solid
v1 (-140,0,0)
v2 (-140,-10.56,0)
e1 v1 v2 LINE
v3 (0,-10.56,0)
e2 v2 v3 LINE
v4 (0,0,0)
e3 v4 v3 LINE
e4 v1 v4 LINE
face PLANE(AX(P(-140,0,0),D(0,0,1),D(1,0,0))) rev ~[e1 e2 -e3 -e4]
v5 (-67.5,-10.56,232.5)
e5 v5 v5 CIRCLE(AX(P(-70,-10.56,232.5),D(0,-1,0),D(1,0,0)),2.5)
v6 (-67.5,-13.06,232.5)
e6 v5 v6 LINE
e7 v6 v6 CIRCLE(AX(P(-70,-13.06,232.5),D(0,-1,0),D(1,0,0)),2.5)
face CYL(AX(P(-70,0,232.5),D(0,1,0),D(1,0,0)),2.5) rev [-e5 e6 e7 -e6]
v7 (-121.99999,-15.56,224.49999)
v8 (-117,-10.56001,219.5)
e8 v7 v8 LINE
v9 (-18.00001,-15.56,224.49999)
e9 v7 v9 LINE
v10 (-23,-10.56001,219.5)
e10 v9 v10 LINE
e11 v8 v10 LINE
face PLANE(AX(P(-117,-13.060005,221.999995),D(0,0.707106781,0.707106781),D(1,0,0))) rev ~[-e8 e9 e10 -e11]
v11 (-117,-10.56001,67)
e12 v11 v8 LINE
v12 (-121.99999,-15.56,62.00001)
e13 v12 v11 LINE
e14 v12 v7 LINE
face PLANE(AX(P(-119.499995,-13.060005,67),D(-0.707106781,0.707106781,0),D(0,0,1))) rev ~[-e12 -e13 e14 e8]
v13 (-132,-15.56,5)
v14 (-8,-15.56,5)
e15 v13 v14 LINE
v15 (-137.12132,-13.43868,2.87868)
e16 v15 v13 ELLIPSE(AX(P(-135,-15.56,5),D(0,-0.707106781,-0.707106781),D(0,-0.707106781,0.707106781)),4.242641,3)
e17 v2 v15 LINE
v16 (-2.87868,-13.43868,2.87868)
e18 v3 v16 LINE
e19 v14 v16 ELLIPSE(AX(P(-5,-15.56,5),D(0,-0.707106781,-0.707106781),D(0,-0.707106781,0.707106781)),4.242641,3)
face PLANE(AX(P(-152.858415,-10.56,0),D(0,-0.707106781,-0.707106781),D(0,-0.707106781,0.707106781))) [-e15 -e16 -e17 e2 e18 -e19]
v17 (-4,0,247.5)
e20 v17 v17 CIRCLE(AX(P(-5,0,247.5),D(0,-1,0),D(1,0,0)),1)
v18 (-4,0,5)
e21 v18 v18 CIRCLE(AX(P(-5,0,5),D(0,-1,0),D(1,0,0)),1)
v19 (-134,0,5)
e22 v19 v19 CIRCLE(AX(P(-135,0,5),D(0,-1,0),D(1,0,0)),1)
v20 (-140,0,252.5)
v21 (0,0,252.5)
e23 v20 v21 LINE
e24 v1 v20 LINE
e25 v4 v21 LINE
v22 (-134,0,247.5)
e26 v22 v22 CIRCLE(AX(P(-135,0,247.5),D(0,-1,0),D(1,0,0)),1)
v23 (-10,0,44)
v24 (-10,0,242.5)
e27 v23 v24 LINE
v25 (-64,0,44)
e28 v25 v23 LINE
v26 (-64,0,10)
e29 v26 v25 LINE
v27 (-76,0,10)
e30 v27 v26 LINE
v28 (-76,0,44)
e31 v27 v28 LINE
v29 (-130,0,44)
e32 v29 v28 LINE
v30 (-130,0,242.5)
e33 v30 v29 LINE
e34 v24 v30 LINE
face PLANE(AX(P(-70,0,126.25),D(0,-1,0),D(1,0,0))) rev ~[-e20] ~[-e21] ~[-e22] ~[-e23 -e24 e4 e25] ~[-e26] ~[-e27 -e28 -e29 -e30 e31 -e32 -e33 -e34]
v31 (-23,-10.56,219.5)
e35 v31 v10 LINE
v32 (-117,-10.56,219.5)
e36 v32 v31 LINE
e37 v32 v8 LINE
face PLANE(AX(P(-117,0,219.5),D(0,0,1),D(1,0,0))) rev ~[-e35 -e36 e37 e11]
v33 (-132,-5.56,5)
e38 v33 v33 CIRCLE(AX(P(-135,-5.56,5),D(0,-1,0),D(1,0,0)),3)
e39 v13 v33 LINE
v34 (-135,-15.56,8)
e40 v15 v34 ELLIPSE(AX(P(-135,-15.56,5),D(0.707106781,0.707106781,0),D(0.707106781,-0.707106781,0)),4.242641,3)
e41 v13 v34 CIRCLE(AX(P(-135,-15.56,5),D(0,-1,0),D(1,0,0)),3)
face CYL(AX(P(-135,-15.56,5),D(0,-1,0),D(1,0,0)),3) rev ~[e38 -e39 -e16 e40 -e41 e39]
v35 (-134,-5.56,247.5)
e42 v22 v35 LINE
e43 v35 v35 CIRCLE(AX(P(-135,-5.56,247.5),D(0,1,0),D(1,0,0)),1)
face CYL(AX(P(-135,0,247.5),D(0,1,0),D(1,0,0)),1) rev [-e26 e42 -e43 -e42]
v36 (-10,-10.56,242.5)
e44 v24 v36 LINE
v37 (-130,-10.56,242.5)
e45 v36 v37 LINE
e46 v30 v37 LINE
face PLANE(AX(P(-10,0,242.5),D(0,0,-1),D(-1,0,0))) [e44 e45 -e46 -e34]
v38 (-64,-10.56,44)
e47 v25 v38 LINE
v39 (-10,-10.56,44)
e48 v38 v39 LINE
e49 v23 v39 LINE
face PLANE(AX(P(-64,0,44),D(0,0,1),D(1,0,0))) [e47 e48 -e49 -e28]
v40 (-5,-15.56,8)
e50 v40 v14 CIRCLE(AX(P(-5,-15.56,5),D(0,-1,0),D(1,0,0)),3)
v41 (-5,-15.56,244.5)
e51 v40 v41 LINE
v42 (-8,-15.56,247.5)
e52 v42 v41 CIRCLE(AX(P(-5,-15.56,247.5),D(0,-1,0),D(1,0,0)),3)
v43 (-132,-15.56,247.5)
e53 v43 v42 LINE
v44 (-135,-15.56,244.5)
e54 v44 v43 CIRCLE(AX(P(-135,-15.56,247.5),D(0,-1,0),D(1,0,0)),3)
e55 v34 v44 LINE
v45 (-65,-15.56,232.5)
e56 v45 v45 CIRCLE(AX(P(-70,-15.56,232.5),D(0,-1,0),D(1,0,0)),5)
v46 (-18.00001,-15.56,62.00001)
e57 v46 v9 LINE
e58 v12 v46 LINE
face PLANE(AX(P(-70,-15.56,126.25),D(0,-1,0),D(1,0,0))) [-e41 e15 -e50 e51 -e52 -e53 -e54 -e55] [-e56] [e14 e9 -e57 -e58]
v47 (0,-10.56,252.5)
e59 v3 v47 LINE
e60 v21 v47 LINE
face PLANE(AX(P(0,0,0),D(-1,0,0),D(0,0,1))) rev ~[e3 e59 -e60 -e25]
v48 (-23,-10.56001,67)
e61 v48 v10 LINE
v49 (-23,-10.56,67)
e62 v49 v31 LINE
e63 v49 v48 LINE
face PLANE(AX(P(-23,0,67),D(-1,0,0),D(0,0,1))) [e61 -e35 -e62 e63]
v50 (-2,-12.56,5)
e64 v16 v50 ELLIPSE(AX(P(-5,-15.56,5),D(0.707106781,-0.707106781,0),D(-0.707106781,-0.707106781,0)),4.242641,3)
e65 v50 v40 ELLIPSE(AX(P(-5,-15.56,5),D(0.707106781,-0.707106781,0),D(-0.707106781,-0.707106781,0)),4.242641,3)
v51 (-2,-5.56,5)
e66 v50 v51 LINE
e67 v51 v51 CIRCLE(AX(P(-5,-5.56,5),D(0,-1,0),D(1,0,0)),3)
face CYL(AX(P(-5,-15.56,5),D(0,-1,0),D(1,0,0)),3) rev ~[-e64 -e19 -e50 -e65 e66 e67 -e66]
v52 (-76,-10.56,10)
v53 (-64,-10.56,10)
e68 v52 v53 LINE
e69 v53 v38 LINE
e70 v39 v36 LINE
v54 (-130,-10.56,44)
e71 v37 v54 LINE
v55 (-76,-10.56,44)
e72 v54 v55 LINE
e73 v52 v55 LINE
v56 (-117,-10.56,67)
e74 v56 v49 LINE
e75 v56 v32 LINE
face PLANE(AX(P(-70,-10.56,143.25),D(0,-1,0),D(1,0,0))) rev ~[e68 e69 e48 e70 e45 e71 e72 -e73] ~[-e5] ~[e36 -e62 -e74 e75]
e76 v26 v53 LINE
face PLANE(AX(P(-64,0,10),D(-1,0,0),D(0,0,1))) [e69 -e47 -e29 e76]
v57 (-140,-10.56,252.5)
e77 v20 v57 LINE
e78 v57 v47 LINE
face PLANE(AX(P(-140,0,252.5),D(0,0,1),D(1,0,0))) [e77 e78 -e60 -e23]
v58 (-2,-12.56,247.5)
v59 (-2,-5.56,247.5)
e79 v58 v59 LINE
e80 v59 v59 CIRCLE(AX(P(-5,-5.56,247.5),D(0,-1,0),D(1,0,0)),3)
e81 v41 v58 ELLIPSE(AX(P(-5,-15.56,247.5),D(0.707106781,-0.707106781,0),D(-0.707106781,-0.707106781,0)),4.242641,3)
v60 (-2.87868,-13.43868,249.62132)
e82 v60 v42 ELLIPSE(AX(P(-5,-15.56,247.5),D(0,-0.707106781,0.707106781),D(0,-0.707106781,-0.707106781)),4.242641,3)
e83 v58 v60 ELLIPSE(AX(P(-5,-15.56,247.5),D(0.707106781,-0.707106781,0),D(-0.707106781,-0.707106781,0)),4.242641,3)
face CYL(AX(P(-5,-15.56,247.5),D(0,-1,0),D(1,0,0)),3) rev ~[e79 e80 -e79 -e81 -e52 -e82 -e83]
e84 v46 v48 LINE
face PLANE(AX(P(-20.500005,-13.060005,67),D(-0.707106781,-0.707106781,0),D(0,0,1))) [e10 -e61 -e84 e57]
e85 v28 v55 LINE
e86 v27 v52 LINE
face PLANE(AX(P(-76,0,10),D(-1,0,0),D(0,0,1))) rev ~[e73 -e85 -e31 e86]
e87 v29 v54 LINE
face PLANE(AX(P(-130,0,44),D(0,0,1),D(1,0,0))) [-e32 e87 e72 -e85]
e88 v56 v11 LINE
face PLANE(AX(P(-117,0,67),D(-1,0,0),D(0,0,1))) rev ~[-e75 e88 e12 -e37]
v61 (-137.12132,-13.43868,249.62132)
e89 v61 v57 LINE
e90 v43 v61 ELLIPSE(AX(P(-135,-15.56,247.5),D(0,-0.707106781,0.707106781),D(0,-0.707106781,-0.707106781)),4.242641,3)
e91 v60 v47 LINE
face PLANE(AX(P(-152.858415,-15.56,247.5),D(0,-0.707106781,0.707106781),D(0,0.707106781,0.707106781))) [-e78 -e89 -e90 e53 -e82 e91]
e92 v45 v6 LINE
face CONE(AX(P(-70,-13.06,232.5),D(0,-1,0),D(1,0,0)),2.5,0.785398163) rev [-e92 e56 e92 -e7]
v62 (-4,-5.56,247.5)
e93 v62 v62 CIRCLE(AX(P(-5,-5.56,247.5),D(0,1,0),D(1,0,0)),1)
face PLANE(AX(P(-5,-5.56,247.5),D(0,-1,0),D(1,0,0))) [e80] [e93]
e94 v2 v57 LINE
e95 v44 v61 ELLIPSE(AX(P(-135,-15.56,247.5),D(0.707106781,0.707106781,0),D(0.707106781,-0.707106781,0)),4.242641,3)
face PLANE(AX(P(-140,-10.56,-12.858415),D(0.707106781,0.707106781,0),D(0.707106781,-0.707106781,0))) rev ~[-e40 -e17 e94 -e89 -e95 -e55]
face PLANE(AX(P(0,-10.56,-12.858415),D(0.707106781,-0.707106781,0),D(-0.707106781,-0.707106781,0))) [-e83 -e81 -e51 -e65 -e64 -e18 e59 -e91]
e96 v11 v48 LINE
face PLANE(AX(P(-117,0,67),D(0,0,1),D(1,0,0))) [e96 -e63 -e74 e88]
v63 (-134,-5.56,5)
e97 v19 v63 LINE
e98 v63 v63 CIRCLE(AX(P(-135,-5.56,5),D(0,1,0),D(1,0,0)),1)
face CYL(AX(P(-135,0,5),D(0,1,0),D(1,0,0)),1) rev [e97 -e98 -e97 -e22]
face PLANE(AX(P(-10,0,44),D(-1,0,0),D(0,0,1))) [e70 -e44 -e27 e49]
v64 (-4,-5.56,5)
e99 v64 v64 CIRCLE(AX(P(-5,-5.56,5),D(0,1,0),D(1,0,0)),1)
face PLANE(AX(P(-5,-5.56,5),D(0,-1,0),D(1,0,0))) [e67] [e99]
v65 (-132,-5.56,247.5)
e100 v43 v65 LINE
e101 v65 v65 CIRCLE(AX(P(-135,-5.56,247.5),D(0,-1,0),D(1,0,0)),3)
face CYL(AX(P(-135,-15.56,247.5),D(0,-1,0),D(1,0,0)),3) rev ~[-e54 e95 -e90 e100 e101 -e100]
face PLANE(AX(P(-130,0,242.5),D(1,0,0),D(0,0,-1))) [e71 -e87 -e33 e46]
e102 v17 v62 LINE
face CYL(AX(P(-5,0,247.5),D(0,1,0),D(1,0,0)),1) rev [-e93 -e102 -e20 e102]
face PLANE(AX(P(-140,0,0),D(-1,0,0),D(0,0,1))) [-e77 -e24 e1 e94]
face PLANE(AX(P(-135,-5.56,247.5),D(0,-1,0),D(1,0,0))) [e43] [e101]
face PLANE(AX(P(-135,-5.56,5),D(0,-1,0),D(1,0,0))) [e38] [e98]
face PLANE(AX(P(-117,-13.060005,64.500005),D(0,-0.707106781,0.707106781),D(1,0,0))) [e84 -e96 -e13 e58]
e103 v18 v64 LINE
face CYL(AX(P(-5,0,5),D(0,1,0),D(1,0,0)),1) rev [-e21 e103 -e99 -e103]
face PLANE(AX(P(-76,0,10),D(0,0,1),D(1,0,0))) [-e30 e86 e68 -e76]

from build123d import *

# Parameters (mm, degrees)
F0_W        = 140
F0_H        = 252.5
F0_R        = 1
F0_W_2      = 94
F0_H_2      = 152.5
F0_R_2      = 2.5
F0_W_3      = 12
F0_H_3      = 34
F1_DEPTH    = 15.56
F2_DEPTH    = 10.56
F3_T1_DEPTH = 165.7168298797
F3_T3_DEPTH = 278.2168298797
F4_SIZE     = 2.5
F5_R        = 3
F6_DEPTH    = 10
F7_SIZE     = 4.99999


# Not quite as in the source:
# - a fillet or chamfer that OpenCascade refuses, or shapes differently, is made with other operations: its cross-section is extruded or revolved along the edge and cut away or added
# - a fillet or chamfer is up to 0.001 mm smaller than in the source, because OpenCascade refuses the exact size
# - a feature names something its author has since deleted; it is built from what else it names


with BuildPart() as f1:
    # F0 (on Front) → F1 (new body)
    with BuildSketch(Plane.XZ):
        with Locations((-70, 126.25)):
            Rectangle(F0_W, F0_H)
        with Locations((-135, 5)):
            Circle(F0_R, mode=Mode.SUBTRACT)
        with Locations((-5, 5)):
            Circle(F0_R, mode=Mode.SUBTRACT)
        with Locations((-135, 247.5)):
            Circle(F0_R, mode=Mode.SUBTRACT)
        Polygon((-130, 44), (-130, 242.5), (-10, 242.5), (-10, 44), (-64, 44), (-64, 10), (-76, 10), (-76, 44), align=None, mode=Mode.SUBTRACT)
        with Locations((-5, 247.5)):
            Circle(F0_R, mode=Mode.SUBTRACT)
        Polygon((-10, 242.5), (-130, 242.5), (-130, 44), (-76, 44), (-64, 44), (-10, 44), align=None)
        with Locations((-70, 143.25)):
            Rectangle(F0_W_2, F0_H_2, mode=Mode.SUBTRACT)
        with Locations((-70, 232.5)):
            Circle(F0_R_2, mode=Mode.SUBTRACT)
        with Locations((-70, 27)):
            Rectangle(F0_W_3, F0_H_3)
    extrude(amount=F1_DEPTH)

    # F0 (on Front) → F2 (cut)
    with BuildSketch(Plane.XZ):
        Polygon((-10, 242.5), (-130, 242.5), (-130, 44), (-76, 44), (-64, 44), (-10, 44), align=None)
        with Locations((-70, 143.25)):
            Rectangle(F0_W_2, F0_H_2, mode=Mode.SUBTRACT)
        with Locations((-70, 232.5)):
            Circle(F0_R_2, mode=Mode.SUBTRACT)
        with Locations((-70, 27)):
            Rectangle(F0_W_3, F0_H_3)
    extrude(amount=F2_DEPTH, mode=Mode.SUBTRACT)

    # F3: chamfer of 5 on 4 edges, made by hand

    # F3_s2 → F3_t1 (cut)
    with BuildSketch(Plane.YZ.offset(-152.8584149398)):
        Polygon((-10.56, 0), (-15.56, 5), (-15.56, 0), align=None)
        Polygon((-15.56, 247.5), (-10.56, 252.5), (-15.56, 252.5), align=None)
    extrude(amount=F3_T1_DEPTH, mode=Mode.SUBTRACT)

    # F3_s4 → F3_t3 (cut)
    with BuildSketch(Plane.XY.offset(-12.8584149398)):
        Polygon((-140, -10.56), (-135, -15.56), (-140, -15.56), align=None)
        Polygon((0, -10.56), (-5, -15.56), (0, -15.56), align=None)
    extrude(amount=F3_T3_DEPTH, mode=Mode.SUBTRACT)

    # F4
    f4_edges = [f1.edges().sort_by_distance(p)[0] for p in [
        (-72.5, -15.56, 232.5),
    ]]
    chamfer(f4_edges, length=F4_SIZE)

    # F5 (on face) → F6 (cut)
    with BuildSketch(Plane.XZ.offset(15.56)):
        with Locations((-135, 247.5)):
            Circle(F5_R)
        with Locations((-135, 5)):
            Circle(F5_R)
        with Locations((-5, 247.5)):
            Circle(F5_R)
        with Locations((-5, 5)):
            Circle(F5_R)
    extrude(amount=-F6_DEPTH, mode=Mode.SUBTRACT)

    # F7 (size 5 in the source; OpenCascade refuses exactly that, so slightly less here)
    f7_edges = [f1.edges().sort_by_distance(p)[0] for p in [
        (-70, -15.56, 67),
        (-117, -15.56, 143.25),
        (-23, -15.56, 143.25),
        (-70, -15.56, 219.5),
    ]]
    chamfer(f7_edges, length=F7_SIZE)


solid = f1.part
